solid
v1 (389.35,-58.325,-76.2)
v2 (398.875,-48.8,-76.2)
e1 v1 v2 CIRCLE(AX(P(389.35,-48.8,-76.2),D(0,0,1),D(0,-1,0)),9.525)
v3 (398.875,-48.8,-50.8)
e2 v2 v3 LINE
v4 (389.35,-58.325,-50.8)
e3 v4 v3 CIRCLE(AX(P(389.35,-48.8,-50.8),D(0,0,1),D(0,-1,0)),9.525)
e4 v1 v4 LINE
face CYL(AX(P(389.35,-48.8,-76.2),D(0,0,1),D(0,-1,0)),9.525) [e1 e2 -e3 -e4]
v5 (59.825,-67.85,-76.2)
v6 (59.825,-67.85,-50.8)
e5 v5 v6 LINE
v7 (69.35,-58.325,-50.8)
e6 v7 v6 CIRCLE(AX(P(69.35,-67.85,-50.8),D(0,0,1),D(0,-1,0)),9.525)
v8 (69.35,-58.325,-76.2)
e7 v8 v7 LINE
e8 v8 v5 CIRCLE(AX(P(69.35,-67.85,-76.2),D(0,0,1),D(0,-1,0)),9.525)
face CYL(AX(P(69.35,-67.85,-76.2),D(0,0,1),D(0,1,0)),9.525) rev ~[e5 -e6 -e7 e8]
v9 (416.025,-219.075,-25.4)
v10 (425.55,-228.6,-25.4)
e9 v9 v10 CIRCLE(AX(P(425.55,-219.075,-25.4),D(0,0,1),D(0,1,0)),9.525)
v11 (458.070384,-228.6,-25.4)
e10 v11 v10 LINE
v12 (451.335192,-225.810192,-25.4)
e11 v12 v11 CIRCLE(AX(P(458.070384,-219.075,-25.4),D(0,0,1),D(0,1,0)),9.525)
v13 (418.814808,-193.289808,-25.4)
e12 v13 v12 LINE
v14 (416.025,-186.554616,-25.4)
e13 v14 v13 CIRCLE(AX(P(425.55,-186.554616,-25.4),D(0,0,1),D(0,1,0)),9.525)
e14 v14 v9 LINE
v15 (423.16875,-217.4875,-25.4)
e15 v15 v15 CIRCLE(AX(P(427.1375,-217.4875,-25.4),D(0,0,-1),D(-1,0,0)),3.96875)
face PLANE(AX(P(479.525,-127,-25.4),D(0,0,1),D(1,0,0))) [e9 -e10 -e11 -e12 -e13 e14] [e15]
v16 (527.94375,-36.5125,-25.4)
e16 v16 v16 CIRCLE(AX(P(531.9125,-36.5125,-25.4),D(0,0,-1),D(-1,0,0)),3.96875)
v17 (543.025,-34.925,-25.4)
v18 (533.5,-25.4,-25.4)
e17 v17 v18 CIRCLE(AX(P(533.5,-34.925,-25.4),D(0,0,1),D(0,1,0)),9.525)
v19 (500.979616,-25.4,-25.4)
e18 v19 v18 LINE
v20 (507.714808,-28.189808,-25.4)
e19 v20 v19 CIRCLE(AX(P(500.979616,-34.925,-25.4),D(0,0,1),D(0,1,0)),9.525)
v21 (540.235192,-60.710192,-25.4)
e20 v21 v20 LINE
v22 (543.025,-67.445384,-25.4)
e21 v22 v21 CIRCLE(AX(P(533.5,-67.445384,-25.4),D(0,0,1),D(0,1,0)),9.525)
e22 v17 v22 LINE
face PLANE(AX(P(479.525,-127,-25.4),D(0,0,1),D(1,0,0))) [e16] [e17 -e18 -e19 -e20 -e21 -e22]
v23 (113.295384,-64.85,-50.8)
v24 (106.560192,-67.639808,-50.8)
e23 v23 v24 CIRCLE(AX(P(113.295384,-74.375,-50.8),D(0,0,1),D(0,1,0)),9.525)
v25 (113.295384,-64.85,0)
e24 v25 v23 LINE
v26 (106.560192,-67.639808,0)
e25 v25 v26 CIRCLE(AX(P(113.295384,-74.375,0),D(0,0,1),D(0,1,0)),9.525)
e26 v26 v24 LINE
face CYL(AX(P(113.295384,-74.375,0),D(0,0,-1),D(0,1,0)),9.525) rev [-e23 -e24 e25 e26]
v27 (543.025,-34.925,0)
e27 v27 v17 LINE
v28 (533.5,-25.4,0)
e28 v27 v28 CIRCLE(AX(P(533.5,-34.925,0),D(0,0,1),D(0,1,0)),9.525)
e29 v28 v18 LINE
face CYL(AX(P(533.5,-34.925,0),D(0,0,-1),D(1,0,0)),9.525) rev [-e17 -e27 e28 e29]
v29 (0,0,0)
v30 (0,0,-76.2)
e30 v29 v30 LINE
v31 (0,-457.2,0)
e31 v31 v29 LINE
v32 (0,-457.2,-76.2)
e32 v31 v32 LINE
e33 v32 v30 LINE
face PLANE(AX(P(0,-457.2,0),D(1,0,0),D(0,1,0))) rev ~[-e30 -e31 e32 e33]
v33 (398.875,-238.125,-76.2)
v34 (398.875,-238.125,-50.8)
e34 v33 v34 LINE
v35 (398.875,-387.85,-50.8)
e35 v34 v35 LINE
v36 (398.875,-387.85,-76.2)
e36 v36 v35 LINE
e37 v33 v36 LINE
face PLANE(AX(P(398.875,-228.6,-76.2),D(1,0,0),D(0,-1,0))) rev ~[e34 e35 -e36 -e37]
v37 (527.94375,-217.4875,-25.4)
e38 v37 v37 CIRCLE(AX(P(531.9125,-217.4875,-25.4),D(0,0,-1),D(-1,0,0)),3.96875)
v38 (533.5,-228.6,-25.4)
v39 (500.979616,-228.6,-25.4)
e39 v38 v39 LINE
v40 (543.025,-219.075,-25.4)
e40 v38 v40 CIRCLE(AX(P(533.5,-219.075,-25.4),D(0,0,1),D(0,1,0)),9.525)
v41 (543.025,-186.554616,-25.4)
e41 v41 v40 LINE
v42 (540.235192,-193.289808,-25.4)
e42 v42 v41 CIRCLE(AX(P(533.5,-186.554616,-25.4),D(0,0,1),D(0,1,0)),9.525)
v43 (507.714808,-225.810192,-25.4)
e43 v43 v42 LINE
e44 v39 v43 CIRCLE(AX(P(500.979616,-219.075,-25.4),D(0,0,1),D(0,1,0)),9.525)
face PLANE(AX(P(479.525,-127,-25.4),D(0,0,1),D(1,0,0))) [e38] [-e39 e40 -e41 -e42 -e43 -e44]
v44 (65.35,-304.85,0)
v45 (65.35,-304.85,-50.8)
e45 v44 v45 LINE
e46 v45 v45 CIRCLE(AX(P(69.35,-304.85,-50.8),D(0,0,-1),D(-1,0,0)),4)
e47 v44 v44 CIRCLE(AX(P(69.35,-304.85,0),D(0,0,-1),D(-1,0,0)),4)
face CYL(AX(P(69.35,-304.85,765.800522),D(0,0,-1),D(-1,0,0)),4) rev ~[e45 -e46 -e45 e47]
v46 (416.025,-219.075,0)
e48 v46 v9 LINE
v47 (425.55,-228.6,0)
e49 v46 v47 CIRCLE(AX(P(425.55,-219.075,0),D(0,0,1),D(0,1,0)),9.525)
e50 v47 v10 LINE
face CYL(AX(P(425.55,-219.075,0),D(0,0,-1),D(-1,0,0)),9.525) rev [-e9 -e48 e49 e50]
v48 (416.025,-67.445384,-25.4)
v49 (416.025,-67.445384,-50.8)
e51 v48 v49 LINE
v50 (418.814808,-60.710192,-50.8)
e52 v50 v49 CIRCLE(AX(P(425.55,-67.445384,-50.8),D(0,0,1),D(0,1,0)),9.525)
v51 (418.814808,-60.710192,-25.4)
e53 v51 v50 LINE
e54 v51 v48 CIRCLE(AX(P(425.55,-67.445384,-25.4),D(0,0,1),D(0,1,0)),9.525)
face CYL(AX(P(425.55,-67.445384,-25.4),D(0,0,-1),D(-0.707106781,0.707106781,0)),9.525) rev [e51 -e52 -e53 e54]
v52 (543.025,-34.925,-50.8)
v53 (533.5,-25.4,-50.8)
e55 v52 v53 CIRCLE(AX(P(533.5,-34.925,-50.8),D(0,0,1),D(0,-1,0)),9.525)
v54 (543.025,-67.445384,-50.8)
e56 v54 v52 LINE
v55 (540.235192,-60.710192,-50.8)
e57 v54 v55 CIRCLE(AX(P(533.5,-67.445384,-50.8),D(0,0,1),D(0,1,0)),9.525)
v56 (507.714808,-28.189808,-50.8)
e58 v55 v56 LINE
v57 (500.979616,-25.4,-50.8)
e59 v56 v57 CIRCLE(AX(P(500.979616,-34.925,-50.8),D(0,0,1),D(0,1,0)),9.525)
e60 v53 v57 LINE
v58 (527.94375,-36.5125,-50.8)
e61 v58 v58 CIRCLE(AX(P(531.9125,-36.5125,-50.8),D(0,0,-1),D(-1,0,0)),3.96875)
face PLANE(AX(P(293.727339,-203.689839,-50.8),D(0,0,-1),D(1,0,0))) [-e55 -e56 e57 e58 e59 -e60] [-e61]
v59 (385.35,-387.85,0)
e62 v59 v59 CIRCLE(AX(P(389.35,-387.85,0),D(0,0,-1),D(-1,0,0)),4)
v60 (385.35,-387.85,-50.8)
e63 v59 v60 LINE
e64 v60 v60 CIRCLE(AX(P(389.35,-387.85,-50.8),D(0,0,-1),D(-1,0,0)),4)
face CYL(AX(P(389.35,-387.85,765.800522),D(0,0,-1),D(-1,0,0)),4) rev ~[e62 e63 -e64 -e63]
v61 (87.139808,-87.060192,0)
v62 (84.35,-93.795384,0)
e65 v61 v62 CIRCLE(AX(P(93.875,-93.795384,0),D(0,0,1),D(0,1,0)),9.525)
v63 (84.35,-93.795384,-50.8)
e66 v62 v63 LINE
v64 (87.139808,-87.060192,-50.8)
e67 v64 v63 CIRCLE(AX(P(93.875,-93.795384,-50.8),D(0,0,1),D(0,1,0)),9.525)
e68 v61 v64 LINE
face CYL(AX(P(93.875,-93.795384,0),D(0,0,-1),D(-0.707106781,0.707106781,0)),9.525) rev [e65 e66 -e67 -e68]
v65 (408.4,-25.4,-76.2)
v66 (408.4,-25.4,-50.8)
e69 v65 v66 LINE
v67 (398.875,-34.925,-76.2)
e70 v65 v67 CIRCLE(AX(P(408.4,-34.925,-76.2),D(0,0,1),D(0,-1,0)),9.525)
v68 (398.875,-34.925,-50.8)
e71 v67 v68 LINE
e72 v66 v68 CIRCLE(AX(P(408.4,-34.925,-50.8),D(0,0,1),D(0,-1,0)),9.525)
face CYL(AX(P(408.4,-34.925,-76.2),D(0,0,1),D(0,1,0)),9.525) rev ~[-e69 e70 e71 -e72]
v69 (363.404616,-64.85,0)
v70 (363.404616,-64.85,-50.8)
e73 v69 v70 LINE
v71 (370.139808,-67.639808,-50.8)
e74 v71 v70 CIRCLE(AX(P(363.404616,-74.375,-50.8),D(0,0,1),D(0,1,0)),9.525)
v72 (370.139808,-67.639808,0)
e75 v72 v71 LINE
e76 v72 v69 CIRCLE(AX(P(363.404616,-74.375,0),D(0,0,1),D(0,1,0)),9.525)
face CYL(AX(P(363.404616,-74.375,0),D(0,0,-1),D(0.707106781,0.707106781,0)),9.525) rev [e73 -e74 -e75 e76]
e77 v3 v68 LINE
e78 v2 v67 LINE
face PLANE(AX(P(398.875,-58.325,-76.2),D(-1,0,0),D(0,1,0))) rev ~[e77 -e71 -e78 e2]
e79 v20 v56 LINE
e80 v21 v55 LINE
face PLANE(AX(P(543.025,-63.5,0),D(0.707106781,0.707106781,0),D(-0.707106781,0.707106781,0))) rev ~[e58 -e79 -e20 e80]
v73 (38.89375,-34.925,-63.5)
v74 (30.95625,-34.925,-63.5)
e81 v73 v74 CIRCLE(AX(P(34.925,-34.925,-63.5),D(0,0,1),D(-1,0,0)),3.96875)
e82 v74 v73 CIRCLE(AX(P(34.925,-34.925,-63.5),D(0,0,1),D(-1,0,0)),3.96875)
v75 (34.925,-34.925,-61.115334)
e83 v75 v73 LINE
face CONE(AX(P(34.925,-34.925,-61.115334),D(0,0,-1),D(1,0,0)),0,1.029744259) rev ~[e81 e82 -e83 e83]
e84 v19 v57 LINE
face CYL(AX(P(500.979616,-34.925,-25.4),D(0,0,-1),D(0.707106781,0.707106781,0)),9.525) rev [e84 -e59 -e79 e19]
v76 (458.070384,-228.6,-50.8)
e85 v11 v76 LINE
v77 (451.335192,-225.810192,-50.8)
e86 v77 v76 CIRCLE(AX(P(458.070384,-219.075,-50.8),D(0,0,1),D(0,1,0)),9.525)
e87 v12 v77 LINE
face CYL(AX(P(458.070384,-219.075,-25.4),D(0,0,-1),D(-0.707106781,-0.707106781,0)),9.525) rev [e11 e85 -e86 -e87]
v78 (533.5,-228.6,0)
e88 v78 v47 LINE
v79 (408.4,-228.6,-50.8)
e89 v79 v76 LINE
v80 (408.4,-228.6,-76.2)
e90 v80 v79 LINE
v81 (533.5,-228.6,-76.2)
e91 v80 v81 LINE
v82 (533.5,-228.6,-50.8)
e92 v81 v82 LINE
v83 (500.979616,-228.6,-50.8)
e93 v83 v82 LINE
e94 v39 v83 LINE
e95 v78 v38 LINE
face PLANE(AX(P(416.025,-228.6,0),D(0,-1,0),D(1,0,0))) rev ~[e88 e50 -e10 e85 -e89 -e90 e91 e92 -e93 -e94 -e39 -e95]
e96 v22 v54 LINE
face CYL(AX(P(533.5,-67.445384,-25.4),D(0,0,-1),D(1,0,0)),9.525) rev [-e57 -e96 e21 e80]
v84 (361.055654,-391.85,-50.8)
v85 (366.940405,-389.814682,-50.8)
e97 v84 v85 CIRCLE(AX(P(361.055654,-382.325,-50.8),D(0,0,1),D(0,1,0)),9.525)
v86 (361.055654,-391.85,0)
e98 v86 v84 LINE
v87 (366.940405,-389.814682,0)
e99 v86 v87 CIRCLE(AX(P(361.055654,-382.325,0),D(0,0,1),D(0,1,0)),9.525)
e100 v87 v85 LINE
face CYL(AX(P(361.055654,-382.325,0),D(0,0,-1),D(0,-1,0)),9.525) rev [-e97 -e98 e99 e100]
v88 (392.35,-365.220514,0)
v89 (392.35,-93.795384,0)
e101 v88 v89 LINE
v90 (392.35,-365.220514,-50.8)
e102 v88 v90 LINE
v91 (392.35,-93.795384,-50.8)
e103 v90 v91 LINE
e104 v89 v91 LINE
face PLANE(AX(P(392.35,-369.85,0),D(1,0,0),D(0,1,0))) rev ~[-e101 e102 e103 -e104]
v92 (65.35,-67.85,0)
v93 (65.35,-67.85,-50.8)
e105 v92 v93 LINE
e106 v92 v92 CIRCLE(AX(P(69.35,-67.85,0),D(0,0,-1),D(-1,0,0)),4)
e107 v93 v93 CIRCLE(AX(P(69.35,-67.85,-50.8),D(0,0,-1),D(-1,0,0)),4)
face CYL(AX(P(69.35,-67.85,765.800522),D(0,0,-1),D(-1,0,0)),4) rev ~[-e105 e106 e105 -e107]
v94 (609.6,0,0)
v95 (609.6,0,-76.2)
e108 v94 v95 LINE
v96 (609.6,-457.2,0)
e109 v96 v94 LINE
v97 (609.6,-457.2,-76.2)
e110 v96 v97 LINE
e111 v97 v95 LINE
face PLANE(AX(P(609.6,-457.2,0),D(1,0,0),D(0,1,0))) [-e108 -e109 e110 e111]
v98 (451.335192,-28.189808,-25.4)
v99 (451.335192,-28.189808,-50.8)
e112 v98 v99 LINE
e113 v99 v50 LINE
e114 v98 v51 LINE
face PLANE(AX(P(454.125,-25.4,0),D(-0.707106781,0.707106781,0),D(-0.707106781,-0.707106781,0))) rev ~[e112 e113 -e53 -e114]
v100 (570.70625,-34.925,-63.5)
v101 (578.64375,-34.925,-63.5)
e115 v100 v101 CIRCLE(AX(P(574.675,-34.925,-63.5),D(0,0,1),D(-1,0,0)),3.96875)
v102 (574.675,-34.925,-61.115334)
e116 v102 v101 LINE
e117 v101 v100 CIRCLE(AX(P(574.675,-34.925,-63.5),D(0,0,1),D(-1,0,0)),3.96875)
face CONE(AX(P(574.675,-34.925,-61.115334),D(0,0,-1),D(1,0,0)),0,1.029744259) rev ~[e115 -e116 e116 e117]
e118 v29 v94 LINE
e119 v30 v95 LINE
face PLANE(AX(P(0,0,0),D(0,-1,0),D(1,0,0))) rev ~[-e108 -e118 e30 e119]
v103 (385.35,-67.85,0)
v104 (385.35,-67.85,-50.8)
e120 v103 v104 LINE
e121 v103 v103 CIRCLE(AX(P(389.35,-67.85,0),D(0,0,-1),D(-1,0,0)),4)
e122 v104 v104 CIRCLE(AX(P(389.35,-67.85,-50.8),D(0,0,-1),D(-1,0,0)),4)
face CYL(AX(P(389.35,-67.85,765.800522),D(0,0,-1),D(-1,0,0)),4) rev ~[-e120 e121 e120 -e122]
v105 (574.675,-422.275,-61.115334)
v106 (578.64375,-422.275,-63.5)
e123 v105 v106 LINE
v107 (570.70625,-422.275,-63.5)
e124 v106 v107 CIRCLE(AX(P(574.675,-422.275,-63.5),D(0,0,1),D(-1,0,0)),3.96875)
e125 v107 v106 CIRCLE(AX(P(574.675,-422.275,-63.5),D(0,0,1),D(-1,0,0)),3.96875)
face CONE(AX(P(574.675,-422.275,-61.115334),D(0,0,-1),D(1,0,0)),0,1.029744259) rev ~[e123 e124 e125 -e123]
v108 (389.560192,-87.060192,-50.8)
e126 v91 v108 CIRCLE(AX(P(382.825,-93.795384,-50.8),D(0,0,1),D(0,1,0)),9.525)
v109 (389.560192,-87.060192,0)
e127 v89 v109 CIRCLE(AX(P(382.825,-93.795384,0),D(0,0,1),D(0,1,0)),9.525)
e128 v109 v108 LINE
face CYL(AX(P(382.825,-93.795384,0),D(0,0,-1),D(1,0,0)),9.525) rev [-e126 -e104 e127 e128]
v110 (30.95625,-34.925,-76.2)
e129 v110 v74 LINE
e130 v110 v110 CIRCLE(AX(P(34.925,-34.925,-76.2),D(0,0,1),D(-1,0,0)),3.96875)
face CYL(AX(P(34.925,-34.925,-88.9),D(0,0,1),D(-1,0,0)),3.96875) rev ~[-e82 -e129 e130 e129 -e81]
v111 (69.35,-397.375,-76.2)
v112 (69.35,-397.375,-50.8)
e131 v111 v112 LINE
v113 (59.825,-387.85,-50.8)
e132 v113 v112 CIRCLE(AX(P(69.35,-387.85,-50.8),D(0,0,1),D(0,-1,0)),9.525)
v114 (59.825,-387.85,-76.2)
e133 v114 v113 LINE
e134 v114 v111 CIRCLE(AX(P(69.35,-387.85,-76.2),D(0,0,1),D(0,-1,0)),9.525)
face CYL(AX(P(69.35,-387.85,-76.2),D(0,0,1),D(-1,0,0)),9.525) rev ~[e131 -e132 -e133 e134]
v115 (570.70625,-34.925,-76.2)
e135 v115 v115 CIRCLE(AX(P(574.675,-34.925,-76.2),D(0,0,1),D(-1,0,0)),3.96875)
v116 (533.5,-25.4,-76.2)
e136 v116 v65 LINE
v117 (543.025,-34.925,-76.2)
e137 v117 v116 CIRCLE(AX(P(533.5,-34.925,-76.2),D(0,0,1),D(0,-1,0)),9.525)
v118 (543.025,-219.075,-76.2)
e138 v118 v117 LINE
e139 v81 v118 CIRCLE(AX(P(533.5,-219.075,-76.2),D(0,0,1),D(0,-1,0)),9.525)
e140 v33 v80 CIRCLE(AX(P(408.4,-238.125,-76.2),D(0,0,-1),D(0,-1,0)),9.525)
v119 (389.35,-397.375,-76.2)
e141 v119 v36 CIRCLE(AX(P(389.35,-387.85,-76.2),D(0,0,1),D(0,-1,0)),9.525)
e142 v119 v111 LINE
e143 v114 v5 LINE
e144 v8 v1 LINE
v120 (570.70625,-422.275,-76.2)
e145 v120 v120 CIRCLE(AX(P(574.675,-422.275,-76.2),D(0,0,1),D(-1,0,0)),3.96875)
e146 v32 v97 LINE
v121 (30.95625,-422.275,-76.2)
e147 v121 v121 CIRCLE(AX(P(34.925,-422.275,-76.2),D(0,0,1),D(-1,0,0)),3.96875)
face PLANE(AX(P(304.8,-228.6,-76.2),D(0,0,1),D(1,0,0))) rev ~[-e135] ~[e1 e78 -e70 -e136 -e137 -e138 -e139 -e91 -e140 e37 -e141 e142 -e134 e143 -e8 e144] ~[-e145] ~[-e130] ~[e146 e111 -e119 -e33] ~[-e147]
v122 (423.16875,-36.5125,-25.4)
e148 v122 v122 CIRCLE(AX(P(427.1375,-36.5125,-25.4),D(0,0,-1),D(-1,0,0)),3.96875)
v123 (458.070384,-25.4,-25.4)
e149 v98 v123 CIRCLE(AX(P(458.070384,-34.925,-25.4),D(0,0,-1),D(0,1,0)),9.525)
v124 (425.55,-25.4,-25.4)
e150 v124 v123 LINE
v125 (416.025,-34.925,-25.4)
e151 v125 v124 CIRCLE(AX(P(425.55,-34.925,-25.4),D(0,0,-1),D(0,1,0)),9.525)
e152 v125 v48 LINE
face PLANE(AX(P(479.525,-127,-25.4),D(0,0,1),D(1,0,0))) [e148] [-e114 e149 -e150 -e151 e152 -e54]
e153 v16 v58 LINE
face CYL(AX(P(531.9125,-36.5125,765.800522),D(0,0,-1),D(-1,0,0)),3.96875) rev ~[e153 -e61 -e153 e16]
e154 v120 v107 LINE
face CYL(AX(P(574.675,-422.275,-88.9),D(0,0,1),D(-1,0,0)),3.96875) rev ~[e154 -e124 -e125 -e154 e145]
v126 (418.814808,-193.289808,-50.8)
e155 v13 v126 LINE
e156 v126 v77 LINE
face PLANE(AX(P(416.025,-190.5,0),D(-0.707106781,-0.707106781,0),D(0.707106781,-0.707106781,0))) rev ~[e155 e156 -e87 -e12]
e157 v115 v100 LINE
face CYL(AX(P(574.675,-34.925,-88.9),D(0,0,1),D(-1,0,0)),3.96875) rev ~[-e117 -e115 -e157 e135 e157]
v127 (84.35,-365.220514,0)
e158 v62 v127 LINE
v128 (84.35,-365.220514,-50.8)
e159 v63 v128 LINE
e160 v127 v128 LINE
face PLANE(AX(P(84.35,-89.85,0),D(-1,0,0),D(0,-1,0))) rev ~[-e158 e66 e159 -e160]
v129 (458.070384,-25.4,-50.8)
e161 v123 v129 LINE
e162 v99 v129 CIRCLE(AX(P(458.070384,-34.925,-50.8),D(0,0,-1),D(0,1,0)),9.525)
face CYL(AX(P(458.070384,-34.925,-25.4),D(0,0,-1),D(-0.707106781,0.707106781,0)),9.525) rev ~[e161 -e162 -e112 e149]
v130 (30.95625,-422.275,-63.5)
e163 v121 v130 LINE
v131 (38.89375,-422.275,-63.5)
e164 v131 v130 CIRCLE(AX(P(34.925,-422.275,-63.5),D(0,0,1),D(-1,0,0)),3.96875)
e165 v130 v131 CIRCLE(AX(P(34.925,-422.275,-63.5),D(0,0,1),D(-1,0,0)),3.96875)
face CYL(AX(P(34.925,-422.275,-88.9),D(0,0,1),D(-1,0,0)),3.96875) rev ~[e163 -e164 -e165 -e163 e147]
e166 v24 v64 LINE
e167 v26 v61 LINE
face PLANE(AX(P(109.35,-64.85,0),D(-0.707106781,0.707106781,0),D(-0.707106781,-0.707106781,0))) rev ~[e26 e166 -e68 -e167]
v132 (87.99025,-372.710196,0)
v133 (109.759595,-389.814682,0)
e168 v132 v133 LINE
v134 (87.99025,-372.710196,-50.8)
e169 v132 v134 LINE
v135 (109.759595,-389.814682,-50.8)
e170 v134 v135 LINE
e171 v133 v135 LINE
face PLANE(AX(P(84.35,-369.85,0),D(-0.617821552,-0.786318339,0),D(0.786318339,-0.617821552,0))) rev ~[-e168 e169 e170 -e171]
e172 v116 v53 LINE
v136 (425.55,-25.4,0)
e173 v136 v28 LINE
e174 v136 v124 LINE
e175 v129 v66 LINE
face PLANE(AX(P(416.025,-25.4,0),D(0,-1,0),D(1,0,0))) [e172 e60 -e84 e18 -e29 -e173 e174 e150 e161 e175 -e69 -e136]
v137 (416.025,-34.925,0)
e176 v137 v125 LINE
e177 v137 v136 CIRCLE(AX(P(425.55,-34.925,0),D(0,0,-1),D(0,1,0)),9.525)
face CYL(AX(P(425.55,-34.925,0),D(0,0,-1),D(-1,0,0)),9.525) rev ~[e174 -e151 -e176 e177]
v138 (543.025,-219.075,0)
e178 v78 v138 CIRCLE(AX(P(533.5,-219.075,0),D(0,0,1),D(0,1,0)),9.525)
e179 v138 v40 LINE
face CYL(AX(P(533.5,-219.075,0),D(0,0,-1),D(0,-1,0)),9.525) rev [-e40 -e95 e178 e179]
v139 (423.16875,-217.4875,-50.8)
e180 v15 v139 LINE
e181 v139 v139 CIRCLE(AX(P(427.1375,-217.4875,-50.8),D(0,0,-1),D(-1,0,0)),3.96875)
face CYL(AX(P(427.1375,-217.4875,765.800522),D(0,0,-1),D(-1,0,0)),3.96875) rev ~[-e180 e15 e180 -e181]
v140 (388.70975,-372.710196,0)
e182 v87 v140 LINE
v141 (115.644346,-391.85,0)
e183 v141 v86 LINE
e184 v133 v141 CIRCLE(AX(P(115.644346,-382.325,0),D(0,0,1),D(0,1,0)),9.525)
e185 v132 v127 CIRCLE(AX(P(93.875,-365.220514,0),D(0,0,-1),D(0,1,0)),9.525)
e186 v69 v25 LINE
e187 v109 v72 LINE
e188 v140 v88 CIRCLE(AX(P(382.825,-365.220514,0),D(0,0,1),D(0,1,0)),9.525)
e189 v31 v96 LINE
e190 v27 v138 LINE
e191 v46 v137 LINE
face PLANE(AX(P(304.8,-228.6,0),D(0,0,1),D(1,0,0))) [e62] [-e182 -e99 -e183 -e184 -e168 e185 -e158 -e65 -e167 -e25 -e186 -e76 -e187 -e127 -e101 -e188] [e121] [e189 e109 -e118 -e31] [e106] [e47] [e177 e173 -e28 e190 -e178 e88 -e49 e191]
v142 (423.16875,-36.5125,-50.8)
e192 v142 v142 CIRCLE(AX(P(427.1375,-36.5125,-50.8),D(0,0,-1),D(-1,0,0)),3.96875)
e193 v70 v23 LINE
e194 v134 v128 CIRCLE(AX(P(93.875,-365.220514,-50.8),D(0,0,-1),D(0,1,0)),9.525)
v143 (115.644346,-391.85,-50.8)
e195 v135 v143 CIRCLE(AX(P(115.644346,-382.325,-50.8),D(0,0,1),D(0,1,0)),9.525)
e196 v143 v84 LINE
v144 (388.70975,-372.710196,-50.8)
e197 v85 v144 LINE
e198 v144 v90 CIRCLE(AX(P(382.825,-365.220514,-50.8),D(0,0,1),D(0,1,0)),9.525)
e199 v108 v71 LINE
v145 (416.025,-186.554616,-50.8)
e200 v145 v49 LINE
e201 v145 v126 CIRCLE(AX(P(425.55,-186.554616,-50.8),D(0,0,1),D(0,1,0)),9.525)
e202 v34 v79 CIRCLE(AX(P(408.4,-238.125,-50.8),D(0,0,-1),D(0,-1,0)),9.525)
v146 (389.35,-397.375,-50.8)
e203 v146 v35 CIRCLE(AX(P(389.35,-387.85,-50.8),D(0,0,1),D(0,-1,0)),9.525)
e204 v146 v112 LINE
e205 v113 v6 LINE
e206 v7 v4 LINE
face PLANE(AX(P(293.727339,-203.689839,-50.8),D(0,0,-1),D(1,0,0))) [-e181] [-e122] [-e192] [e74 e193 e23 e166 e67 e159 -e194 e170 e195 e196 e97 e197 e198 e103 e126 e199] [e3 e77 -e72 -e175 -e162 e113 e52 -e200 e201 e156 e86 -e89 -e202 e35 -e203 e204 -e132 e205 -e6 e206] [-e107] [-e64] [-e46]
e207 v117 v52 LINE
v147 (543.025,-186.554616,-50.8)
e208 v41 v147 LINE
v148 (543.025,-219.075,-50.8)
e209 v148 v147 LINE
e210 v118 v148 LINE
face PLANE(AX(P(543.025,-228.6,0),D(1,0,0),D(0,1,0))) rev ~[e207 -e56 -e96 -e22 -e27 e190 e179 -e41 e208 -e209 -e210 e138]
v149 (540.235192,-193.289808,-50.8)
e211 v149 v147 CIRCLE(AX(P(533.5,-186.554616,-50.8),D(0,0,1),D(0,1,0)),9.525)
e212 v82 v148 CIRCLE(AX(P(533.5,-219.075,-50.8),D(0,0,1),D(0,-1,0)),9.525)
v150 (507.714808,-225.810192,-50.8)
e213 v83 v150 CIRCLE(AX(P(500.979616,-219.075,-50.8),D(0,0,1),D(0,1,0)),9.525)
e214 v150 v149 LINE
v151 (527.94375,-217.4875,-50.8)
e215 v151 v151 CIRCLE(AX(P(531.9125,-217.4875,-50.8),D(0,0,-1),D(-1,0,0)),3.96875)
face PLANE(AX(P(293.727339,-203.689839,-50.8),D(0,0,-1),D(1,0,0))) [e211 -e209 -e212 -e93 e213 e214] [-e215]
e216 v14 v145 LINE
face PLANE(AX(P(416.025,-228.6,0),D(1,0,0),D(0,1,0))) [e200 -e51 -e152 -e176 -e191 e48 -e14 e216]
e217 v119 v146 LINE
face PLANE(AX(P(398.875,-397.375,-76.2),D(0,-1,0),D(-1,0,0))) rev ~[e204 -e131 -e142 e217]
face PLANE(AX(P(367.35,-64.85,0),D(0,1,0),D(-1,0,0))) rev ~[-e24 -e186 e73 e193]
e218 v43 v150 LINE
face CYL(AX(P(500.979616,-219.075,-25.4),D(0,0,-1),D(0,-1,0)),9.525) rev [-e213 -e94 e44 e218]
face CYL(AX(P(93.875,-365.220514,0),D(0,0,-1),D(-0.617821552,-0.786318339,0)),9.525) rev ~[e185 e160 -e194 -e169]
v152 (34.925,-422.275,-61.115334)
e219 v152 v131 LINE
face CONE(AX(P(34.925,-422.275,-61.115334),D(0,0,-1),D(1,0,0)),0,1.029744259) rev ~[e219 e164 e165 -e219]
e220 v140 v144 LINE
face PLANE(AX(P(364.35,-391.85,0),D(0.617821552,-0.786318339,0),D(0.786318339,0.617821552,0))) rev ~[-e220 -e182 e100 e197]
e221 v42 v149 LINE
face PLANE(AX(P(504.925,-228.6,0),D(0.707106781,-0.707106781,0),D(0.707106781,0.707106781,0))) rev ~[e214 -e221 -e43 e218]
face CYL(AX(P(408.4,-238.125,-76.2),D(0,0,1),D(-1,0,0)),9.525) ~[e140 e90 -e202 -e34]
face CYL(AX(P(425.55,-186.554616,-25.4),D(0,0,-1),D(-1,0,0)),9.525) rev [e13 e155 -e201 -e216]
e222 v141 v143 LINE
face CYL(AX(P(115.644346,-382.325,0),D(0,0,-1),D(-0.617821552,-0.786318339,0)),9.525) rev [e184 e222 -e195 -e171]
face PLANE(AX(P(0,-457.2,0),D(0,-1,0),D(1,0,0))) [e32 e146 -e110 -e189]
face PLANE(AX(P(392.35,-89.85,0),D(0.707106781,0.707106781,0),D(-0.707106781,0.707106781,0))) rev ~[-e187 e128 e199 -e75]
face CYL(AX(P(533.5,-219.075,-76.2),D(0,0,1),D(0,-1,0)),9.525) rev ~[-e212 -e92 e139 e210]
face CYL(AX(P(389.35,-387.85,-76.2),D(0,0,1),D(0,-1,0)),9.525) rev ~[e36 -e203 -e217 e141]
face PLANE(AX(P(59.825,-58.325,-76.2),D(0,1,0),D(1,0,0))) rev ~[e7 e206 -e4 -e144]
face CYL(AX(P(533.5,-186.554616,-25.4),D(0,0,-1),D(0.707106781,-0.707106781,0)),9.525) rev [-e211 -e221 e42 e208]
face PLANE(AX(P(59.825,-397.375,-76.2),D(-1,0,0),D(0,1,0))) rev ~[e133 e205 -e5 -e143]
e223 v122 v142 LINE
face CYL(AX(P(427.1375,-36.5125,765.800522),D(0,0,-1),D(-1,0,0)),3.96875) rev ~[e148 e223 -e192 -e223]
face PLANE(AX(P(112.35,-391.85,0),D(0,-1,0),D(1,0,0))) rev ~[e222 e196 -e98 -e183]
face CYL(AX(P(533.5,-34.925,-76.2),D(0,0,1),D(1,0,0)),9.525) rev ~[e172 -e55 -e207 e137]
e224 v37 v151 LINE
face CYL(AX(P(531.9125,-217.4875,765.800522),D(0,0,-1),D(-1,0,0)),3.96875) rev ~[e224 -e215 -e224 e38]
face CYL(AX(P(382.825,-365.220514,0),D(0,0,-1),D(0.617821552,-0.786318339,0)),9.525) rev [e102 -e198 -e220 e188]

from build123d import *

# Parameters (mm, degrees)
F0_W      = 609.6
F0_H      = 457.2
F1_DEPTH  = 76.2
F3_DEPTH  = 76.201
F5_D      = 8
F6_W      = 127
F6_H      = 203.2
F7_DEPTH  = 25.4
F9_DEPTH  = 76.201
F11_DEPTH = 25.4
F12_R     = 9.525
F14_D     = 7.9375
F16_D     = 7.9375
F16_DEPTH = 12.7
F16_TIP   = 2.3846655818


# Not quite as in the source:
# - a feature names something its author has since deleted; it is built from what else it names


with BuildPart() as f1:
    # F0 (on Top) → F1 (new body)
    with BuildSketch(Plane.XY):
        with Locations((304.8, -228.6)):
            Rectangle(F0_W, F0_H)
    extrude(amount=-F1_DEPTH)

    # F2 (on Top) → F3 (cut, through all)
    with BuildSketch(Plane.XY):
        Polygon((392.35, -89.85), (367.35, -64.85), (109.35, -64.85), (84.35, -89.85), (84.35, -369.85), (112.35, -391.85), (364.35, -391.85), (392.35, -369.85), align=None)
    extrude(amount=-F3_DEPTH, mode=Mode.SUBTRACT)

    # F5 (through all)
    with Locations(Plane.XY):
        with Locations((69.35, -67.85), (389.35, -67.85), (389.35, -387.85), (69.35, -304.85)):
            Hole(F5_D / 2)

    # F6 (on Top) → F7 (cut)
    with BuildSketch(Plane.XY):
        with Locations((479.525, -127)):
            Rectangle(F6_W, F6_H)
    extrude(amount=-F7_DEPTH, mode=Mode.SUBTRACT)

    # F8 (on Top) → F9 (cut, through all)
    with BuildSketch(Plane.XY):
        Polygon((454.125, -25.4), (416.025, -63.5), (416.025, -190.5), (454.125, -228.6), (504.925, -228.6), (543.025, -190.5), (543.025, -63.5), (504.925, -25.4), align=None)
    extrude(amount=-F9_DEPTH, mode=Mode.SUBTRACT)

    # F10 (on face) → F11 (cut)
    with BuildSketch(Plane(origin=(0, 0, -76.2), x_dir=(1, 0, 0), z_dir=(0, 0, -1))):
        Polygon((398.875, 25.4), (416.025, 25.4), (543.025, 25.4), (543.025, 228.6), (416.025, 228.6), (398.875, 228.6), (398.875, 397.375), (59.825, 397.375), (59.825, 58.325), (398.875, 58.325), align=None)
    extrude(amount=-F11_DEPTH, mode=Mode.SUBTRACT)

    # F12
    f12_edges = [f1.edges().sort_by_distance(p)[0] for p in [
        (364.35, -391.85, -25.4),
        (392.35, -369.85, -25.4),
        (392.35, -89.85, -25.4),
        (367.35, -64.85, -25.4),
        (109.35, -64.85, -25.4),
        (84.35, -89.85, -25.4),
        (84.35, -369.85, -25.4),
        (112.35, -391.85, -25.4),
        (59.825, -397.375, -63.5),
        (59.825, -58.325, -63.5),
        (398.875, -58.325, -63.5),
        (398.875, -25.4, -63.5),
        (543.025, -25.4, -63.5),
        (543.025, -228.6, -63.5),
        (398.875, -228.6, -63.5),
        (398.875, -397.375, -63.5),
        (454.125, -228.6, -38.1),
        (416.025, -190.5, -38.1),
        (504.925, -228.6, -38.1),
        (543.025, -190.5, -38.1),
        (416.025, -63.5, -38.1),
        (454.125, -25.4, -38.1),
        (504.925, -25.4, -38.1),
        (543.025, -63.5, -38.1),
        (416.025, -25.4, -12.7),
        (543.025, -25.4, -12.7),
        (416.025, -228.6, -12.7),
        (543.025, -228.6, -12.7),
    ]]
    fillet(f12_edges, radius=F12_R)

    # F14 (through all)
    with Locations(Plane.XY):
        with Locations((427.1375, -36.5125), (531.9125, -36.5125), (531.9125, -217.4875), (427.1375, -217.4875)):
            Hole(F14_D / 2)

    # F16
    with Locations(Plane(origin=(0, 0, -76.2), x_dir=(1, 0, 0), z_dir=(0, 0, -1))):
        with Locations((34.925, 422.275), (574.675, 422.275), (574.675, 34.925), (34.925, 34.925)):
            Hole(F16_D / 2, depth=F16_DEPTH)
            with Locations((0, 0, -(F16_DEPTH + F16_TIP / 2))):  # 118° drill point
                Cone(0, F16_D / 2, F16_TIP, mode=Mode.SUBTRACT)


solid = f1.part
